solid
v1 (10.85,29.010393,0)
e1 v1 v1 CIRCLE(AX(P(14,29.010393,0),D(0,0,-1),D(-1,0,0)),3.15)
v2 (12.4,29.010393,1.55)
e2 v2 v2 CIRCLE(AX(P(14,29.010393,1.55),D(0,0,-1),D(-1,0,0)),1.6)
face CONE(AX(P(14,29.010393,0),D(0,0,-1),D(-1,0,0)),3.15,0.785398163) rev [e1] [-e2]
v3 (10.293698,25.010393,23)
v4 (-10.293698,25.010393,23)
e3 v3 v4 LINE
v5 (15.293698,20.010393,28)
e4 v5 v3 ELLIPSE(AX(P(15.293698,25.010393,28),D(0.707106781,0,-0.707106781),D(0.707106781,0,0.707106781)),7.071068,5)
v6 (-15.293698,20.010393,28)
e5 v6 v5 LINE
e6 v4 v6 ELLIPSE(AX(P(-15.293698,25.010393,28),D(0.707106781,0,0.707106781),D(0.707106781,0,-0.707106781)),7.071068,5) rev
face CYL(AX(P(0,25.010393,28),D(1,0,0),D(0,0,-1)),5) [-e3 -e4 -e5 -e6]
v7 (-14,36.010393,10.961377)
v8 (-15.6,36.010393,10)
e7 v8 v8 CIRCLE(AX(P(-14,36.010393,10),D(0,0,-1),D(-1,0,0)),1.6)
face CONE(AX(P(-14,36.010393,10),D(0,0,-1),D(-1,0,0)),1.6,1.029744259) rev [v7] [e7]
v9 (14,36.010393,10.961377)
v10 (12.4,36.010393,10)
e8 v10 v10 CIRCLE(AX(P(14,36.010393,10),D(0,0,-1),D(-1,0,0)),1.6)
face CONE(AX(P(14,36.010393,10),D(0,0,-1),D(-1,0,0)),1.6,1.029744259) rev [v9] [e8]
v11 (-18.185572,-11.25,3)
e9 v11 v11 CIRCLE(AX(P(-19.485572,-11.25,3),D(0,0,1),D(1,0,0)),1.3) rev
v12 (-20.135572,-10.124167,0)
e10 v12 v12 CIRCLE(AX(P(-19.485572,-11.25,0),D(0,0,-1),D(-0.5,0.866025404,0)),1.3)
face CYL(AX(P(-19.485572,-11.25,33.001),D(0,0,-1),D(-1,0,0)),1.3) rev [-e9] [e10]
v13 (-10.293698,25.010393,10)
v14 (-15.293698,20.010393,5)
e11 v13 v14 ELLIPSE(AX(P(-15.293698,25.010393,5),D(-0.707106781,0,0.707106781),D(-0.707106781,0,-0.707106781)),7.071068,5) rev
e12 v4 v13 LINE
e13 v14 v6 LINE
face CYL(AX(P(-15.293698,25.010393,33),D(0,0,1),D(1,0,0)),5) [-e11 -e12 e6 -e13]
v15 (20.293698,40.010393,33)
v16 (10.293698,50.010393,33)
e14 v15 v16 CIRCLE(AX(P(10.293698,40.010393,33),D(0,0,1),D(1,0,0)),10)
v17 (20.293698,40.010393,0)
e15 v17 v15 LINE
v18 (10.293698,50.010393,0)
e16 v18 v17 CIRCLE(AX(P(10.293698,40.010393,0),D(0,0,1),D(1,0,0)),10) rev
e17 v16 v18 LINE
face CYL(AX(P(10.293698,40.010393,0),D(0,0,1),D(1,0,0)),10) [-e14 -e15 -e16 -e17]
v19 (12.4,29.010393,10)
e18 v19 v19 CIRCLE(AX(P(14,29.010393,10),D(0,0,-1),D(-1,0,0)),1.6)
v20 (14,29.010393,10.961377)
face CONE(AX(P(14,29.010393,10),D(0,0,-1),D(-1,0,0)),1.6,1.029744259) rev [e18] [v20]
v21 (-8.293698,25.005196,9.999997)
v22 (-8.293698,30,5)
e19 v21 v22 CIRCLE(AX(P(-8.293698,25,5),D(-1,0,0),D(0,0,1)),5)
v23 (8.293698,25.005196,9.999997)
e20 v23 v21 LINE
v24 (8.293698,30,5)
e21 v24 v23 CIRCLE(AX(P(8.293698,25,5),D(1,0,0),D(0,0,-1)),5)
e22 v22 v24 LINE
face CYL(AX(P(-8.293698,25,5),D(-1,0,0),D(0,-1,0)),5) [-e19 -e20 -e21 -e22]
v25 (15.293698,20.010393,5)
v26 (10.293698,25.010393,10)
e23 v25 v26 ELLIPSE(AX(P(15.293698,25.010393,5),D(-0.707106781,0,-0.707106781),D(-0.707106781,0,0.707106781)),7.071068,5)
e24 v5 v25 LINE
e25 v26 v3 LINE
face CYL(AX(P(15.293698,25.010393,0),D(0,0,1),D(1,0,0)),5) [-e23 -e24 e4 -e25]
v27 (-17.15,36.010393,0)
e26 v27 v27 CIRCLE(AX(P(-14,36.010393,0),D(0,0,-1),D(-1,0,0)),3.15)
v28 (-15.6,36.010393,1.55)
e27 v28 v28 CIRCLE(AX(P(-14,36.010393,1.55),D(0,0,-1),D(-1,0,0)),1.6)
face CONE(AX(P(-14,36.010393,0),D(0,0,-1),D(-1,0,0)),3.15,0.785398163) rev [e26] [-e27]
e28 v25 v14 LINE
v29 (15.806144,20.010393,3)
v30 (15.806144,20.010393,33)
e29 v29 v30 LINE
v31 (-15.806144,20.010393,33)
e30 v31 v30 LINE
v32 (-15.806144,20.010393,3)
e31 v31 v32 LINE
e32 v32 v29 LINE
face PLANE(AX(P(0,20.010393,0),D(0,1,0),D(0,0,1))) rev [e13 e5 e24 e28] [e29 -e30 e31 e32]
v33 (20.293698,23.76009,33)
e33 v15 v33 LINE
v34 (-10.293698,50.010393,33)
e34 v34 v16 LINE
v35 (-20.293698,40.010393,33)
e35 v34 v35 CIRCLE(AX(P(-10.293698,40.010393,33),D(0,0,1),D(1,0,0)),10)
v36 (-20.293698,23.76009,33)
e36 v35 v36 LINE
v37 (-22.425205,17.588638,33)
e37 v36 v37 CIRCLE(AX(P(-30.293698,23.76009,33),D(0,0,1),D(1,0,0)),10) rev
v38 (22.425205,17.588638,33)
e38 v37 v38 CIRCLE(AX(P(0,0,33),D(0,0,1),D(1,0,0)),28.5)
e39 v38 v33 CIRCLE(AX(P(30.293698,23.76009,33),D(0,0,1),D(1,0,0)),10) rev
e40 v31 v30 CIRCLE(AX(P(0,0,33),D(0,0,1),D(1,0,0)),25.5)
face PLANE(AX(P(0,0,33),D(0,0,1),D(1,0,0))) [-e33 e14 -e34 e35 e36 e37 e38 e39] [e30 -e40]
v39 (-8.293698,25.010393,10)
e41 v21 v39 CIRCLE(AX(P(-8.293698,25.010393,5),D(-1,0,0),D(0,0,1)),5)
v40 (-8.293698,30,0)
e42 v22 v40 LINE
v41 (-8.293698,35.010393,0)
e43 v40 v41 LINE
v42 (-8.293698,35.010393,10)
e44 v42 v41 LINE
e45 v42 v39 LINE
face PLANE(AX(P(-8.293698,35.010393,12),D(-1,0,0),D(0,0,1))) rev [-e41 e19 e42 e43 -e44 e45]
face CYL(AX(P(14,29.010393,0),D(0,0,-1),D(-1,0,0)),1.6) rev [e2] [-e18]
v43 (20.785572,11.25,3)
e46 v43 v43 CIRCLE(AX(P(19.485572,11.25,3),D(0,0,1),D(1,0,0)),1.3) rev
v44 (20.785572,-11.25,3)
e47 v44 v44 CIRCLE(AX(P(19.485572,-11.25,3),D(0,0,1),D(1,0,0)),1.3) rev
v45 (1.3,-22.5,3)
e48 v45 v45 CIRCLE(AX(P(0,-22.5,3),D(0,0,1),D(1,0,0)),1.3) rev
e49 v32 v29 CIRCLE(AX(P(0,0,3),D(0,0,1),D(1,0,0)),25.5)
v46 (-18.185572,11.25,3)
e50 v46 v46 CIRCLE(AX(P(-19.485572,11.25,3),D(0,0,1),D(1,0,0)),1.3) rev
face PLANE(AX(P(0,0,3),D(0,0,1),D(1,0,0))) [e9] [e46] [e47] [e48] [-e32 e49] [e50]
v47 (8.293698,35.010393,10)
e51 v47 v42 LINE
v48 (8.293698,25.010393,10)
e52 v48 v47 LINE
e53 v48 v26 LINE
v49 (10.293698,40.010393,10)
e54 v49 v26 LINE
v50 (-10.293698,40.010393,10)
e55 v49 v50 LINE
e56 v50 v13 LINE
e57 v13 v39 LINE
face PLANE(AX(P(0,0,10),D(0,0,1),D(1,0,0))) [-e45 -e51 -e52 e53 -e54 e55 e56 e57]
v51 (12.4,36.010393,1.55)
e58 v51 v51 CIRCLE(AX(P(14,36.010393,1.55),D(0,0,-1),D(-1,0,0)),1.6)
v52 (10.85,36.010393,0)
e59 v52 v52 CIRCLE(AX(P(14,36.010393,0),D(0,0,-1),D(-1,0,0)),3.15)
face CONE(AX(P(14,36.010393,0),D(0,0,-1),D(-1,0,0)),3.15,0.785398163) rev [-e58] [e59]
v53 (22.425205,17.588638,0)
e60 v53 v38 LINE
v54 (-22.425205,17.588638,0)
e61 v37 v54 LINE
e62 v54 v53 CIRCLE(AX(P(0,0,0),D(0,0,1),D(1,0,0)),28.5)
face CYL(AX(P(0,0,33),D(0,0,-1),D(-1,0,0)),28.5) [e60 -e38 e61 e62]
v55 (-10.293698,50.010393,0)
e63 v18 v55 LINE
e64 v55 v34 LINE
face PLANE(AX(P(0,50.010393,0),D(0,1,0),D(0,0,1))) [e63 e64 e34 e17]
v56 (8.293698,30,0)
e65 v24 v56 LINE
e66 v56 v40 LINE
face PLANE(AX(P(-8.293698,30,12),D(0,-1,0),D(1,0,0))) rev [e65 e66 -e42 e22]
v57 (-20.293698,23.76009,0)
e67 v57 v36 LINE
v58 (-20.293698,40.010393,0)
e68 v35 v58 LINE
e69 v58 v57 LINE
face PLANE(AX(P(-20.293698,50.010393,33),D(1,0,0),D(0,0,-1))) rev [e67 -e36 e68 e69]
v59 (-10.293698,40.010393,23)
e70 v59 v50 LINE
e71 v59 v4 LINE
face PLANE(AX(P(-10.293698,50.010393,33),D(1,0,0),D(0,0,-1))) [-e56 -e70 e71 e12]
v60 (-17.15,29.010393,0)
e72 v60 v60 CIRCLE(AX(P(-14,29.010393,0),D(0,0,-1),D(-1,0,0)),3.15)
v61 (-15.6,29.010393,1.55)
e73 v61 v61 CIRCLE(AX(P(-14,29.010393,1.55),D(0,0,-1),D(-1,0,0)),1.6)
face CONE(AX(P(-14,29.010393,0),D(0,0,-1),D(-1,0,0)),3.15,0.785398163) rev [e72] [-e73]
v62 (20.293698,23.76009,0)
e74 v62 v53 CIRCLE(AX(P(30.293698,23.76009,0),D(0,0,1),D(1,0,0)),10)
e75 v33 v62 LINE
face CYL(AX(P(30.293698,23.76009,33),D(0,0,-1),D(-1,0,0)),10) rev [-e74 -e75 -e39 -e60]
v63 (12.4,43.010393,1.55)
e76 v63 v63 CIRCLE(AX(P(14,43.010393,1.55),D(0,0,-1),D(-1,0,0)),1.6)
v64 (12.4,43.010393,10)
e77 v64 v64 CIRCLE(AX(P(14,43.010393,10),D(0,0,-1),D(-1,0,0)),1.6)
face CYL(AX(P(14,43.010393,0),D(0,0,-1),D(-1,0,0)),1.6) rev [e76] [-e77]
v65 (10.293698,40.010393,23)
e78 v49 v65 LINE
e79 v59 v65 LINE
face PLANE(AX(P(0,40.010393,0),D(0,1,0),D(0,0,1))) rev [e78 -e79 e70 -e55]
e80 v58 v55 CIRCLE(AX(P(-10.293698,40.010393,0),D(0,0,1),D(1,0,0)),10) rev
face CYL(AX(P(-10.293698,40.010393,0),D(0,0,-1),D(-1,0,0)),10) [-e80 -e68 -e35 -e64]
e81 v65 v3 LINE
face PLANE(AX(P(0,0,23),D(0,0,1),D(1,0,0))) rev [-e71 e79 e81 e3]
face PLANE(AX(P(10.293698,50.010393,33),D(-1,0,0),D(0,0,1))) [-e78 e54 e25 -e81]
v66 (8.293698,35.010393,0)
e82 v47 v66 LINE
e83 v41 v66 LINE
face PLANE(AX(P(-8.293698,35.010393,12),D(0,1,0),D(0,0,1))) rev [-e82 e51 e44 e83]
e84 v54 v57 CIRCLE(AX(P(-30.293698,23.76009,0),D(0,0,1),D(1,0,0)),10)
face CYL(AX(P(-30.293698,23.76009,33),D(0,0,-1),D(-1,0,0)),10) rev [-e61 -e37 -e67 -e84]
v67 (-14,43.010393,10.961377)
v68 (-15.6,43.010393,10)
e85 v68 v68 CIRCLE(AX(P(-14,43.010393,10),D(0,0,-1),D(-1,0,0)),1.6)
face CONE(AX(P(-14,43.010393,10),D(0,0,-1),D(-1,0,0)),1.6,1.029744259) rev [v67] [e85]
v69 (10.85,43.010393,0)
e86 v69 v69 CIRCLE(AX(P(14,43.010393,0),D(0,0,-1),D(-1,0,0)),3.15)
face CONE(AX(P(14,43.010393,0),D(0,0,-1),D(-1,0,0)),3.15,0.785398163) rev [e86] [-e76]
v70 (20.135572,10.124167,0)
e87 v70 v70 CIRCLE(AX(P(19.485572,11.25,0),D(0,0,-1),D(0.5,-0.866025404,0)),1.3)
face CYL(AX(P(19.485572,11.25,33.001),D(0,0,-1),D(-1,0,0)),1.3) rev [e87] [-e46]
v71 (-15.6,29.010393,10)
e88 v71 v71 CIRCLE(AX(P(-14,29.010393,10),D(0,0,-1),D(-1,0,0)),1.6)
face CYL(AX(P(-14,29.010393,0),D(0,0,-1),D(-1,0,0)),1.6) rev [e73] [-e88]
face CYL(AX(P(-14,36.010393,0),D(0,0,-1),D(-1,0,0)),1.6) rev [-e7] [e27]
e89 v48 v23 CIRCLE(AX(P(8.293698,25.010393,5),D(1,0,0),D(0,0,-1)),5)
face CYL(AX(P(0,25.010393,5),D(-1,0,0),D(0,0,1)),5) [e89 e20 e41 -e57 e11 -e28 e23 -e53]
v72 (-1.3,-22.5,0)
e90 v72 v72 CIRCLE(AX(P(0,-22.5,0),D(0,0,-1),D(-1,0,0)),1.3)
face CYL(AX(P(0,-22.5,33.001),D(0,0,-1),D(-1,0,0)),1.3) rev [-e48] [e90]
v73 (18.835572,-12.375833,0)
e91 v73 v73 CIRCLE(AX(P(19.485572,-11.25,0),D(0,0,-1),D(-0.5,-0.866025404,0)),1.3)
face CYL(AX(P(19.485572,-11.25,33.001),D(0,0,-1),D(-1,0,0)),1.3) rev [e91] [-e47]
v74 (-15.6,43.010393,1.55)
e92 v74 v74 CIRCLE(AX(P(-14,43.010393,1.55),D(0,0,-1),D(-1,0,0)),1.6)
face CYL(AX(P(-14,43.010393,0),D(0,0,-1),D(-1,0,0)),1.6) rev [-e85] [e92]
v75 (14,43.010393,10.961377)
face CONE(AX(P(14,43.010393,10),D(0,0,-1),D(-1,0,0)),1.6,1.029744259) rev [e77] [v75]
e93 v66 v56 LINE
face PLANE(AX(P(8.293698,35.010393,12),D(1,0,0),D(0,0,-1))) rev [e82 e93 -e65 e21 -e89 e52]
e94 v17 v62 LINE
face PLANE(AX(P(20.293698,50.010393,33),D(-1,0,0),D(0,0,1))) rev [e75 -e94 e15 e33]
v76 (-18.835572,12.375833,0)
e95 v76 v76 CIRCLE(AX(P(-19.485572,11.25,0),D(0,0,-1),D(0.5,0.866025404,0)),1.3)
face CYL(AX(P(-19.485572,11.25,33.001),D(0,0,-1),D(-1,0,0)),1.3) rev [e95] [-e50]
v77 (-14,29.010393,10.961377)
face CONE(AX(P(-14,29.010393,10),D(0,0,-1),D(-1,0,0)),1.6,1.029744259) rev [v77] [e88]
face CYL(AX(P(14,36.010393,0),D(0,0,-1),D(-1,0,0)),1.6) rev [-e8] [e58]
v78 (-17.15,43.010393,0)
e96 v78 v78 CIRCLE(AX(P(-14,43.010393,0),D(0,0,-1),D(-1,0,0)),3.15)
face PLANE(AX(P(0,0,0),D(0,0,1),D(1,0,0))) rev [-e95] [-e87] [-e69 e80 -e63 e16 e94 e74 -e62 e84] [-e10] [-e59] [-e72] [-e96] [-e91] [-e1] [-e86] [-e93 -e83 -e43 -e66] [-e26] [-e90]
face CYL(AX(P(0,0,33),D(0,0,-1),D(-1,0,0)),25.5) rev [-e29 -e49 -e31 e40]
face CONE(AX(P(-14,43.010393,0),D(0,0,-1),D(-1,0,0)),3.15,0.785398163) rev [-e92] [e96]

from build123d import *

# Parameters (mm, degrees)
SKETCH1_R                                       = 28.5
BOSS_EXTRUDE1_DEPTH                             = 33
SHELL1_T                                        = -3
SKETCH2_W                                       = 68.33882079
SKETCH2_H                                       = 10.979214438
CUT_EXTRUDE1_DEPTH                              = 53.091266063
SKETCH3_W                                       = 40.58739611
SKETCH3_H                                       = 33
BOSS_EXTRUDE2_DEPTH                             = 30
CUT_EXTRUDE4_REACH                              = 68.35
SKETCH6_R                                       = 1.3
CIRPATTERN1_COUNT                               = 6
FILLET1_R                                       = 10
SHELL2_START                                    = 10
SHELL2_DEPTH                                    = 13
SKETCH9_W                                       = 16.58739611
SKETCH9_H                                       = 5.010392781
CUT_EXTRUDE6_DEPTH                              = 12
CSK_FOR_M3_FLAT_HEAD_MACHINE_SCREW1_D           = 3.2
CSK_FOR_M3_FLAT_HEAD_MACHINE_SCREW1_DEPTH       = 10
CSK_FOR_M3_FLAT_HEAD_MACHINE_SCREW1_CSINK_D     = 6.3
CSK_FOR_M3_FLAT_HEAD_MACHINE_SCREW1_CSINK_ANGLE = 90
CSK_FOR_M3_FLAT_HEAD_MACHINE_SCREW1_TIP         = 0.96137699
FILLET2_R                                       = 5
FILLET3_R                                       = 5


# Read off the part's stored shape, not the designer's step: Shell2
with BuildPart() as part:
    # Sketch1 → Boss-Extrude1 (new body)
    with BuildSketch(Plane.XY):
        Circle(SKETCH1_R)
    extrude(amount=BOSS_EXTRUDE1_DEPTH)

    # Shell1
    shell1_openings = [part.faces().sort_by_distance(p)[0] for p in [
        (0, 0, 33),
    ]]
    offset(amount=SHELL1_T, openings=shell1_openings, kind=Kind.INTERSECTION)

    # Sketch2 → Cut-Extrude1 (cut, through all)
    with BuildSketch(Plane.XY.offset(33)):
        with Locations((0, 25.5)):
            Rectangle(SKETCH2_W, SKETCH2_H)
    extrude(amount=-CUT_EXTRUDE1_DEPTH, mode=Mode.SUBTRACT)

    # Sketch3 → Boss-Extrude2 (add)
    with BuildSketch(Plane(origin=(0, 20.010392781, 0), x_dir=(1, 0, 0), z_dir=(0, 1, 0))):
        with Locations((0, -16.5)):
            Rectangle(SKETCH3_W, SKETCH3_H)
    extrude(amount=BOSS_EXTRUDE2_DEPTH)

    # Sketch6 → Cut-Extrude4 (cut, up to next)
    with BuildSketch(Plane(origin=(0, 0, 0), x_dir=(-1, 0, 0), z_dir=(0, 0, -1)), mode=Mode.PRIVATE) as cut_extrude4_sk1:
        with Locations((0, -22.5)):
            Circle(SKETCH6_R)
    cut_extrude4_tool1 = extrude(cut_extrude4_sk1.sketch, amount=-CUT_EXTRUDE4_REACH, mode=Mode.PRIVATE) & part.part
    cut_extrude4 = cut_extrude4_tool1.solids().sort_by_distance((0, -22.5, 0))[0]
    add(cut_extrude4, mode=Mode.SUBTRACT)

    # CirPattern1: Cut-Extrude4 ×6 about axis, 1 skipped
    cirpattern1_axis = Axis((0, 0, 0), (0, 0, 1))
    add([cut_extrude4.rotate(cirpattern1_axis, i * 360 / CIRPATTERN1_COUNT) for i in range(1, CIRPATTERN1_COUNT) if i not in (3,)], mode=Mode.SUBTRACT)

    # Fillet1
    fillet1_edges = [part.edges().sort_by_distance(p)[0] for p in [
        (-20.293698055, 20.010392781, 16.5),
        (20.293698055, 20.010392781, 16.5),
        (-20.293698055, 50.010392781, 16.5),
        (20.293698055, 50.010392781, 16.5),
    ]]
    fillet(fillet1_edges, radius=FILLET1_R)

    # Shell2 outline → Shell2 (cut)
    with BuildSketch(Plane.XY.offset(SHELL2_START)):
        with BuildLine():
            Line((-10.293698055, 40.010392781), (-10.293698055, 23.760089607))
            ThreePointArc((-10.293698055, 23.760089607), (-10.382557976, 21.876874075), (-10.648348129, 20.010392781))
            Line((-10.648348129, 20.010392781), (10.648348129, 20.010392781))
            ThreePointArc((10.648348129, 20.010392781), (10.382557976, 21.876874075), (10.293698055, 23.760089607))
            Line((10.293698055, 23.760089607), (10.293698055, 40.010392781))
            Line((10.293698055, 40.010392781), (-10.293698055, 40.010392781))
        make_face()
    extrude(amount=SHELL2_DEPTH, mode=Mode.SUBTRACT)

    # Sketch9 → Cut-Extrude6 (cut)
    with BuildSketch(Plane(origin=(0, 0, 0), x_dir=(-1, 0, 0), z_dir=(0, 0, -1))):
        with Locations((0, 32.505196391)):
            Rectangle(SKETCH9_W, SKETCH9_H)
    extrude(amount=-CUT_EXTRUDE6_DEPTH, mode=Mode.SUBTRACT)

    # CSK for M3 Flat Head Machine Screw1
    with Locations(Plane(origin=(0, 0, 0), x_dir=(-1, 0, 0), z_dir=(0, 0, -1))):
        with Locations((-14, 43.010392781), (-14, 29.010392781), (14, 43.010392781), (14, 36.010392781), (14, 29.010392781), (-14, 36.010392781)):
            CounterSinkHole(CSK_FOR_M3_FLAT_HEAD_MACHINE_SCREW1_D / 2, CSK_FOR_M3_FLAT_HEAD_MACHINE_SCREW1_CSINK_D / 2, depth=CSK_FOR_M3_FLAT_HEAD_MACHINE_SCREW1_DEPTH, counter_sink_angle=CSK_FOR_M3_FLAT_HEAD_MACHINE_SCREW1_CSINK_ANGLE)
            with Locations((0, 0, -(CSK_FOR_M3_FLAT_HEAD_MACHINE_SCREW1_DEPTH + CSK_FOR_M3_FLAT_HEAD_MACHINE_SCREW1_TIP / 2))):  # 118° drill point
                Cone(0, CSK_FOR_M3_FLAT_HEAD_MACHINE_SCREW1_D / 2, CSK_FOR_M3_FLAT_HEAD_MACHINE_SCREW1_TIP, mode=Mode.SUBTRACT)

    # Fillet2
    fillet2_edges = [part.edges().sort_by_distance(p)[0] for p in [
        (0, 20.010392781, 23),
        (0, 20.010392781, 10),
        (10.648348129, 20.010392781, 16.5),
        (-10.648348129, 20.010392781, 16.5),
    ]]
    fillet(fillet2_edges, radius=FILLET2_R)

    # Fillet3
    # the kernel refuses this fillet: 5 mm, written as the material it takes off along each edge
    with BuildSketch(Plane(origin=(-8.293698055, 30, 10), x_dir=(0, -1, 0), z_dir=(1, 0, 0))) as fillet3_piece_1:
        with BuildLine():
            CenterArc((FILLET3_R, FILLET3_R), FILLET3_R, 180, 90)
            Line((0, FILLET3_R), (0, 0))
            Line((0, 0), (FILLET3_R, 0))
        make_face()
    extrude(amount=16.58739611, mode=Mode.SUBTRACT)


solid = part.part
